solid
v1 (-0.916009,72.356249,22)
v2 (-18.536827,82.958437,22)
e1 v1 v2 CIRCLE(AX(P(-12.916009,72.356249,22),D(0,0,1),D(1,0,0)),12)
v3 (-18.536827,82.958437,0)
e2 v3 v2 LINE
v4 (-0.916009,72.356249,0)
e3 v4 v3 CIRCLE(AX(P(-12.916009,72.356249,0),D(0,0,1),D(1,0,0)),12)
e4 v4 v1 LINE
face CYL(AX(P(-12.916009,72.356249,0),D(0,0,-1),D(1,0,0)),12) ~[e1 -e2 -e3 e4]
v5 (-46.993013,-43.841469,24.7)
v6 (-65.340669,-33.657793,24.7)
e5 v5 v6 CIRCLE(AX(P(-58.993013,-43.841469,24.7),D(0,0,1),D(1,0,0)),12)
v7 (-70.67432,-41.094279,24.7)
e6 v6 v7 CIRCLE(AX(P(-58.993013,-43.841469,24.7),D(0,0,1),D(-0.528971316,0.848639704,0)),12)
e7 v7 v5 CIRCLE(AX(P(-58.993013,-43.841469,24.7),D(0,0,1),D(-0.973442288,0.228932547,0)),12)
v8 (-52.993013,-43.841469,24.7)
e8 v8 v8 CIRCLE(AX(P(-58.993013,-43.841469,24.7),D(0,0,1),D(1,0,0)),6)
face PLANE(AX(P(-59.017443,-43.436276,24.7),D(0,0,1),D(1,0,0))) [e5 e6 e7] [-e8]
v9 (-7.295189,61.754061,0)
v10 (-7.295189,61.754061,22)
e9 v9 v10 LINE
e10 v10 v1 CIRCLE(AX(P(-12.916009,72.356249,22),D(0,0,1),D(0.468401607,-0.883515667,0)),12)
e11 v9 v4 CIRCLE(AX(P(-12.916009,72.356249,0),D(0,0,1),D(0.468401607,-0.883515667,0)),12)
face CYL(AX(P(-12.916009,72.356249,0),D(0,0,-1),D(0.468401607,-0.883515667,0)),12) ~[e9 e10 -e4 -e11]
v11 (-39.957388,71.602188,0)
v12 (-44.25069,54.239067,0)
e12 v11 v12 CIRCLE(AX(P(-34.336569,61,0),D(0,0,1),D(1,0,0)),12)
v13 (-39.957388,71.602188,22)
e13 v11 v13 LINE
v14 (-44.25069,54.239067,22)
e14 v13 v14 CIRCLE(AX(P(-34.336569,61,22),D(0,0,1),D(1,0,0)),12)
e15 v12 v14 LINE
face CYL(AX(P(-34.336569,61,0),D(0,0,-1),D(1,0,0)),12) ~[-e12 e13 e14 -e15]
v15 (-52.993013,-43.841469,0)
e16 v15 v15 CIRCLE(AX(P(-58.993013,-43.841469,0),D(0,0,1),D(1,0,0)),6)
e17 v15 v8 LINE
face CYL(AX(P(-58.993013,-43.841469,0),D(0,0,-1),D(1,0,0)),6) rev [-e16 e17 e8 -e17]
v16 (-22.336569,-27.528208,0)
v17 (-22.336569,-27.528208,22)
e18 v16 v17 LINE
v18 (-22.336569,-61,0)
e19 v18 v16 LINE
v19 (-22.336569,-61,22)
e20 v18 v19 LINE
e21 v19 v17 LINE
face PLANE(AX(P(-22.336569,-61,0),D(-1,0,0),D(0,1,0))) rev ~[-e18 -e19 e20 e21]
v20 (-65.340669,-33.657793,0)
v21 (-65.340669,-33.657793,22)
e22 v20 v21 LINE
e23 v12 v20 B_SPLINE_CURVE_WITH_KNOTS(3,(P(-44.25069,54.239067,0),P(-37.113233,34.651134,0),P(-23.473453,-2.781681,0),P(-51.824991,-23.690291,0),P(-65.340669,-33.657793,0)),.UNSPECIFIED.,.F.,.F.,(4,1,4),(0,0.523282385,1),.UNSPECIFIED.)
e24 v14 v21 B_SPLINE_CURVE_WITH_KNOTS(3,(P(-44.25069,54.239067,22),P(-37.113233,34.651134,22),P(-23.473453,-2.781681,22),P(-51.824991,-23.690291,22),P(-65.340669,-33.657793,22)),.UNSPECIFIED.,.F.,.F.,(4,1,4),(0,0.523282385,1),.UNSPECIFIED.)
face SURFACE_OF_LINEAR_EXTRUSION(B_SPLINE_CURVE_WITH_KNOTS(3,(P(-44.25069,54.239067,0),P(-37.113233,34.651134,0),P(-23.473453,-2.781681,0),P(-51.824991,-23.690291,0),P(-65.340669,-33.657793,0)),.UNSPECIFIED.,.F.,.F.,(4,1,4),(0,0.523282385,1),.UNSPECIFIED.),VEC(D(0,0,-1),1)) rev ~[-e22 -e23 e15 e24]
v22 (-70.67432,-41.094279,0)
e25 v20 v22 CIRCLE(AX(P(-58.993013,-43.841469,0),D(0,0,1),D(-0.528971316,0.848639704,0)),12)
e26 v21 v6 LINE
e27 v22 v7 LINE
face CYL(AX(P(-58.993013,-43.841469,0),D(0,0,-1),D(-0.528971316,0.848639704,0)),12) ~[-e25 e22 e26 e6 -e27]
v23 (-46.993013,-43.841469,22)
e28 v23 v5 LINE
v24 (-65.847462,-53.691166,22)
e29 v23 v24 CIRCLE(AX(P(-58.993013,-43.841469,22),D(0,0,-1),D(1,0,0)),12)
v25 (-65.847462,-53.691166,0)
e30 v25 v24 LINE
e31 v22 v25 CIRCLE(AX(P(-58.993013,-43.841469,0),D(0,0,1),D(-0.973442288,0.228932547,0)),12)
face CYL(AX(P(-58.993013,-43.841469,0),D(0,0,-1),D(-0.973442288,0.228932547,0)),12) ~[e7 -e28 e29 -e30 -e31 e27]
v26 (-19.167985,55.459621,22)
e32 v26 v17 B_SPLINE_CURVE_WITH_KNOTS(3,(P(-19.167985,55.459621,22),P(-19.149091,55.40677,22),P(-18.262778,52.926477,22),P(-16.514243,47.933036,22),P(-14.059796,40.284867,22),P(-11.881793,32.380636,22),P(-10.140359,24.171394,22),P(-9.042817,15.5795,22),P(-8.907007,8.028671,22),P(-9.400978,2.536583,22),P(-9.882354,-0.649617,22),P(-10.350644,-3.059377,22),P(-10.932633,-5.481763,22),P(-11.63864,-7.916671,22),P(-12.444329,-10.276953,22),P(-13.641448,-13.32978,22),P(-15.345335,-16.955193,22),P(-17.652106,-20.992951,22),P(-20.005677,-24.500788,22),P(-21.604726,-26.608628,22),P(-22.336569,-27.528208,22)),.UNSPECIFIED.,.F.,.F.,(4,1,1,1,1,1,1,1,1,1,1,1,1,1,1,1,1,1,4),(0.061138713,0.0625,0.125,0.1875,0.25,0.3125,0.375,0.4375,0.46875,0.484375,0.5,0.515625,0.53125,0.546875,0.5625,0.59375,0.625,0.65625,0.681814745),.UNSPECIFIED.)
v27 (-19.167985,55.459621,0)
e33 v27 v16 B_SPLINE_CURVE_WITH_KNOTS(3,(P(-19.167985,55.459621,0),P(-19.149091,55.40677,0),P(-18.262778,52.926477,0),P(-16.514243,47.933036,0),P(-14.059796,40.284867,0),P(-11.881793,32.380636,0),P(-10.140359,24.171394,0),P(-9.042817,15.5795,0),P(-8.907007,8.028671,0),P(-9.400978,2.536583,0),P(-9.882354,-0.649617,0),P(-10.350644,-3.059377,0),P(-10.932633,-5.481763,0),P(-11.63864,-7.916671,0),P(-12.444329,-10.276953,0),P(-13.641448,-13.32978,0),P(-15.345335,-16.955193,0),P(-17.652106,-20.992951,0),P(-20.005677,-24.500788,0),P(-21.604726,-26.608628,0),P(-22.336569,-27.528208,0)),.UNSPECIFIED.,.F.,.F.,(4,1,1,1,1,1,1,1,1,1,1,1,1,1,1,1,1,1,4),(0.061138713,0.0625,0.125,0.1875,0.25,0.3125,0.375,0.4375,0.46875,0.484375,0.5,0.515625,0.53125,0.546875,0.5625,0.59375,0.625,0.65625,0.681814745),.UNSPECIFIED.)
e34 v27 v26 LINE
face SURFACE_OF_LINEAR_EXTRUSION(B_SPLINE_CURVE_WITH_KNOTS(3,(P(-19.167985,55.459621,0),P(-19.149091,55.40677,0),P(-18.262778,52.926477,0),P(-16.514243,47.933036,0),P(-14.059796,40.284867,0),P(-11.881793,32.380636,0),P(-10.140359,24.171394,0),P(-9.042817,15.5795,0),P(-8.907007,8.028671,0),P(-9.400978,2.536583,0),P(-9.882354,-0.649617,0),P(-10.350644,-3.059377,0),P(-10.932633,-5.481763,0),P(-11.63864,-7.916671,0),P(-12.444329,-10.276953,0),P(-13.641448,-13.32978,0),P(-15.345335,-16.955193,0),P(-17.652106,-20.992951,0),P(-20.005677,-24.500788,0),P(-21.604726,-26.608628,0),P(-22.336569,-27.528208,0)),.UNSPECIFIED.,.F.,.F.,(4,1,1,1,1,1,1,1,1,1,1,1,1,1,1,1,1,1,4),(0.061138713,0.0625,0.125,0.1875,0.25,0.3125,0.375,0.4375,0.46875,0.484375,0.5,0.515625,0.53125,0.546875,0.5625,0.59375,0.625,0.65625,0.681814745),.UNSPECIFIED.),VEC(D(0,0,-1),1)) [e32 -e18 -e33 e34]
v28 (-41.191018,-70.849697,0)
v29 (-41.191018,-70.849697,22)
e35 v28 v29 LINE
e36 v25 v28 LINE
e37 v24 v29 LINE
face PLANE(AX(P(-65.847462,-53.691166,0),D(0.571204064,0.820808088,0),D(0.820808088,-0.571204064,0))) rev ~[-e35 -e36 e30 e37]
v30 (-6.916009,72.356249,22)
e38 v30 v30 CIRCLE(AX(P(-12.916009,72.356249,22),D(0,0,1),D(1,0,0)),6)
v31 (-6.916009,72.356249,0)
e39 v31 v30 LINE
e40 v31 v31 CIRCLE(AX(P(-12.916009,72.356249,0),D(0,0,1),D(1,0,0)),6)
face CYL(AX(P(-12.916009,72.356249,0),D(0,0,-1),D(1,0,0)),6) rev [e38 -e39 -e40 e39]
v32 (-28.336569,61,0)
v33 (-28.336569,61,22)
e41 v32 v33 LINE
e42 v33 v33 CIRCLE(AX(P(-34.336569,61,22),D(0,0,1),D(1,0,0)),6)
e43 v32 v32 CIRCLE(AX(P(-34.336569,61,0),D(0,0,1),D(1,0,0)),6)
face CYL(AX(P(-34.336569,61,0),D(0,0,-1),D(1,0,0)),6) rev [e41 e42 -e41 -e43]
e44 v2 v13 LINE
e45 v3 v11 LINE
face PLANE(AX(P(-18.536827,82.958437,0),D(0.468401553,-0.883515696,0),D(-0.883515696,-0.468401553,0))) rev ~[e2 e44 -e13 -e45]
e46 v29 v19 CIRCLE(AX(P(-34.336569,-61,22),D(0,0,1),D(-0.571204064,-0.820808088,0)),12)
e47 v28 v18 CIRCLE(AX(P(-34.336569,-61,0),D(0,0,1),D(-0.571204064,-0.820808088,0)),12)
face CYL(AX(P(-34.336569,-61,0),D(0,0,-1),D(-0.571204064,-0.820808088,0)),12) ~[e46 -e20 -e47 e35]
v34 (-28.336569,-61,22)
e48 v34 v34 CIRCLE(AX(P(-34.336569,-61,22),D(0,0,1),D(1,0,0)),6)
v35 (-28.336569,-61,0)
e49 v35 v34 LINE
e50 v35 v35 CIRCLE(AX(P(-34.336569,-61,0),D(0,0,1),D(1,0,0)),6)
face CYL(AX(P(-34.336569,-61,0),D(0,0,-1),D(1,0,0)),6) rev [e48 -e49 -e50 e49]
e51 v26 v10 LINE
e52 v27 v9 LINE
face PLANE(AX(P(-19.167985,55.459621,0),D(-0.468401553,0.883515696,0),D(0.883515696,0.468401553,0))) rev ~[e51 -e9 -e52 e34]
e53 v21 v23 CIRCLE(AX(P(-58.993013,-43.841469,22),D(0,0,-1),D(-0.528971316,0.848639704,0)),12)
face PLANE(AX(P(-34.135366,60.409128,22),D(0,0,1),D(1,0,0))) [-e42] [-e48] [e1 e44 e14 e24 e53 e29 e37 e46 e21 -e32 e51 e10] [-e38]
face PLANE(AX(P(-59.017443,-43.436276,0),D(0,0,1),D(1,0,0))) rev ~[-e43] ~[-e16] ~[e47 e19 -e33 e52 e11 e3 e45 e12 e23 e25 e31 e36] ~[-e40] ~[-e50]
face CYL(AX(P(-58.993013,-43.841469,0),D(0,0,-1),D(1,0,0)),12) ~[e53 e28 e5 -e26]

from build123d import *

# Parameters (mm, degrees)
F0_R     = 6
F1_DEPTH = 22
F2_DEPTH = 24.7


# Not quite as in the source:
# - the dataset's text gives a spline's control points without its knots; the knots are read off the source's solid
# - a feature names something its author has since deleted; it is built from what else it names


with BuildPart() as f1:
    # F0 (on Top) → F1 (new body)
    with BuildSketch(Plane.XY):
        with BuildLine():
            ThreePointArc((-44.2506901264, 54.2390673163), (-37.2170072256, 49.3508335883), (-28.7157507853, 50.3978116504))
            ThreePointArc((-28.7157507853, 50.3978116504), (-24.0543074262, 54.8133136372), (-22.3365694268, 61))
            ThreePointArc((-22.3365694268, 61), (-28.149883064, 71.2822620006), (-39.9573880683, 71.6021883496))
            ThreePointArc((-39.9573880683, 71.6021883496), (-45.9857358385, 63.8804377989), (-44.2506901264, 54.2390673163))
        make_face()
        with Locations((-34.3365694268, 61)):
            Circle(F0_R, mode=Mode.SUBTRACT)
        with BuildLine():
            ThreePointArc((-41.1910181988, -70.8496970528), (-28.7801940464, -71.6361032635), (-22.3365694268, -61))
            ThreePointArc((-22.3365694268, -61), (-39.8929448072, -50.3638967365), (-41.1910181988, -70.8496970528))
        make_face()
        with Locations((-34.3365694268, -61)):
            Circle(F0_R, mode=Mode.SUBTRACT)
        with BuildLine():
            ThreePointArc((-18.536827307, 82.9584370096), (-23.5181968435, 66.7354296949), (-7.2951893768, 61.7540606536))
            ThreePointArc((-7.2951893768, 61.7540606536), (-2.6337464761, 66.1695626111), (-0.9160086655, 72.35624866))
            ThreePointArc((-0.9160086655, 72.35624866), (-6.7293223028, 82.6385106606), (-18.536827307, 82.9584370096))
        make_face()
        with Locations((-12.9160086655, 72.35624866)):
            Circle(F0_R, mode=Mode.SUBTRACT)
        with BuildLine():
            Line((-22.3365694268, 51.1162809556), (-22.3365694268, -27.5282078784))
            add(Edge.make_bspline(
                [(-19.1679852382, 55.4596212318), (-19.1490913177, 55.4067702681), (-18.2627780559, 52.9264771043), (-16.5142433132, 47.9330355336), (-14.0597955985, 40.2848666723), (-11.8817933237, 32.380636116), (-10.1403594344, 24.1713941631), (-9.0428174028, 15.5795000988), (-8.9070069048, 8.0286707772), (-9.4009784523, 2.5365834769), (-9.8823537024, -0.64961691), (-10.3506440426, -3.0593767725), (-10.9326328555, -5.4817632435), (-11.6386397696, -7.9166705081), (-12.4443293031, -10.2769526895), (-13.6414482379, -13.3297795407), (-15.3453349713, -16.9551929086), (-17.6521060756, -20.9929507786), (-20.005676914, -24.5007883382), (-21.6047261121, -26.6086284401), (-22.3365694268, -27.5282078784)],
                knots=[0.0611387127, 0.0611387127, 0.0611387127, 0.0611387127, 0.0625, 0.125, 0.1875, 0.25, 0.3125, 0.375, 0.4375, 0.46875, 0.484375, 0.5, 0.515625, 0.53125, 0.546875, 0.5625, 0.59375, 0.625, 0.65625, 0.6818147445, 0.6818147445, 0.6818147445, 0.6818147445], degree=3))
            Line((-19.1679852382, 55.4596212318), (-21.0545147962, 54.4594654001))
            ThreePointArc((-21.0545147962, 54.4594654001), (-22.0050663394, 52.9065704787), (-22.3365694268, 51.1162809556))
        make_face()
        with BuildLine():
            ThreePointArc((-41.1910181988, -70.8496970528), (-39.8929448072, -50.3638967365), (-22.3365694268, -61))
            Line((-22.3365694268, -61), (-22.3365694268, -27.5282078784))
            Line((-22.3365694268, -27.5282078784), (-22.3365694268, 51.1162809556))
            ThreePointArc((-22.3365694268, 51.1162809556), (-22.0050663394, 52.9065704787), (-21.0545147962, 54.4594654001))
            Line((-21.0545147962, 54.4594654001), (-28.7157507853, 50.3978116504))
            ThreePointArc((-28.7157507853, 50.3978116504), (-37.2170072256, 49.3508335883), (-44.2506901264, 54.2390673163))
            add(Edge.make_bspline(
                [(-44.2506901264, 54.2390673163), (-37.1132332482, 34.6511342855), (-23.4734527351, -2.7816813244), (-51.824990918, -23.6902906337), (-65.3406685812, -33.657792996)],
                knots=[0, 0, 0, 0, 0.523282385, 1, 1, 1, 1], degree=3))
            ThreePointArc((-65.3406685812, -33.657792996), (-53.1694343986, -33.3492849771), (-46.993012785, -43.8414694388))
            ThreePointArc((-46.993012785, -43.8414694388), (-53.4366374046, -54.4775727023), (-65.847461557, -53.6911664916))
            Line((-65.847461557, -53.6911664916), (-41.1910181988, -70.8496970528))
        make_face()
        with BuildLine():
            Line((-21.0545147962, 54.4594654001), (-19.1679852382, 55.4596212318))
            Line((-19.1679852382, 55.4596212318), (-7.2951893768, 61.7540606536))
            ThreePointArc((-7.2951893768, 61.7540606536), (-23.5181968435, 66.7354296949), (-18.536827307, 82.9584370096))
            Line((-18.536827307, 82.9584370096), (-39.9573880683, 71.6021883496))
            ThreePointArc((-39.9573880683, 71.6021883496), (-28.149883064, 71.2822620006), (-22.3365694268, 61))
            ThreePointArc((-22.3365694268, 61), (-24.0543074262, 54.8133136372), (-28.7157507853, 50.3978116504))
            Line((-28.7157507853, 50.3978116504), (-21.0545147962, 54.4594654001))
        make_face()
    extrude(amount=F1_DEPTH)

    # F0 (on Top) → F2 (join)
    with BuildSketch(Plane.XY):
        with BuildLine():
            ThreePointArc((-70.6743202458, -41.0942788729), (-70.1985453114, -48.1351905289), (-65.847461557, -53.6911664916))
            ThreePointArc((-65.847461557, -53.6911664916), (-53.4366374046, -54.4775727023), (-46.993012785, -43.8414694388))
            ThreePointArc((-46.993012785, -43.8414694388), (-53.1694343986, -33.3492849771), (-65.3406685812, -33.657792996))
            ThreePointArc((-65.3406685812, -33.657792996), (-68.7442285851, -36.8476299769), (-70.6743202458, -41.0942788729))
        make_face()
        with Locations((-58.993012785, -43.8414694388)):
            Circle(F0_R, mode=Mode.SUBTRACT)
    extrude(amount=F2_DEPTH)


solid = f1.part
